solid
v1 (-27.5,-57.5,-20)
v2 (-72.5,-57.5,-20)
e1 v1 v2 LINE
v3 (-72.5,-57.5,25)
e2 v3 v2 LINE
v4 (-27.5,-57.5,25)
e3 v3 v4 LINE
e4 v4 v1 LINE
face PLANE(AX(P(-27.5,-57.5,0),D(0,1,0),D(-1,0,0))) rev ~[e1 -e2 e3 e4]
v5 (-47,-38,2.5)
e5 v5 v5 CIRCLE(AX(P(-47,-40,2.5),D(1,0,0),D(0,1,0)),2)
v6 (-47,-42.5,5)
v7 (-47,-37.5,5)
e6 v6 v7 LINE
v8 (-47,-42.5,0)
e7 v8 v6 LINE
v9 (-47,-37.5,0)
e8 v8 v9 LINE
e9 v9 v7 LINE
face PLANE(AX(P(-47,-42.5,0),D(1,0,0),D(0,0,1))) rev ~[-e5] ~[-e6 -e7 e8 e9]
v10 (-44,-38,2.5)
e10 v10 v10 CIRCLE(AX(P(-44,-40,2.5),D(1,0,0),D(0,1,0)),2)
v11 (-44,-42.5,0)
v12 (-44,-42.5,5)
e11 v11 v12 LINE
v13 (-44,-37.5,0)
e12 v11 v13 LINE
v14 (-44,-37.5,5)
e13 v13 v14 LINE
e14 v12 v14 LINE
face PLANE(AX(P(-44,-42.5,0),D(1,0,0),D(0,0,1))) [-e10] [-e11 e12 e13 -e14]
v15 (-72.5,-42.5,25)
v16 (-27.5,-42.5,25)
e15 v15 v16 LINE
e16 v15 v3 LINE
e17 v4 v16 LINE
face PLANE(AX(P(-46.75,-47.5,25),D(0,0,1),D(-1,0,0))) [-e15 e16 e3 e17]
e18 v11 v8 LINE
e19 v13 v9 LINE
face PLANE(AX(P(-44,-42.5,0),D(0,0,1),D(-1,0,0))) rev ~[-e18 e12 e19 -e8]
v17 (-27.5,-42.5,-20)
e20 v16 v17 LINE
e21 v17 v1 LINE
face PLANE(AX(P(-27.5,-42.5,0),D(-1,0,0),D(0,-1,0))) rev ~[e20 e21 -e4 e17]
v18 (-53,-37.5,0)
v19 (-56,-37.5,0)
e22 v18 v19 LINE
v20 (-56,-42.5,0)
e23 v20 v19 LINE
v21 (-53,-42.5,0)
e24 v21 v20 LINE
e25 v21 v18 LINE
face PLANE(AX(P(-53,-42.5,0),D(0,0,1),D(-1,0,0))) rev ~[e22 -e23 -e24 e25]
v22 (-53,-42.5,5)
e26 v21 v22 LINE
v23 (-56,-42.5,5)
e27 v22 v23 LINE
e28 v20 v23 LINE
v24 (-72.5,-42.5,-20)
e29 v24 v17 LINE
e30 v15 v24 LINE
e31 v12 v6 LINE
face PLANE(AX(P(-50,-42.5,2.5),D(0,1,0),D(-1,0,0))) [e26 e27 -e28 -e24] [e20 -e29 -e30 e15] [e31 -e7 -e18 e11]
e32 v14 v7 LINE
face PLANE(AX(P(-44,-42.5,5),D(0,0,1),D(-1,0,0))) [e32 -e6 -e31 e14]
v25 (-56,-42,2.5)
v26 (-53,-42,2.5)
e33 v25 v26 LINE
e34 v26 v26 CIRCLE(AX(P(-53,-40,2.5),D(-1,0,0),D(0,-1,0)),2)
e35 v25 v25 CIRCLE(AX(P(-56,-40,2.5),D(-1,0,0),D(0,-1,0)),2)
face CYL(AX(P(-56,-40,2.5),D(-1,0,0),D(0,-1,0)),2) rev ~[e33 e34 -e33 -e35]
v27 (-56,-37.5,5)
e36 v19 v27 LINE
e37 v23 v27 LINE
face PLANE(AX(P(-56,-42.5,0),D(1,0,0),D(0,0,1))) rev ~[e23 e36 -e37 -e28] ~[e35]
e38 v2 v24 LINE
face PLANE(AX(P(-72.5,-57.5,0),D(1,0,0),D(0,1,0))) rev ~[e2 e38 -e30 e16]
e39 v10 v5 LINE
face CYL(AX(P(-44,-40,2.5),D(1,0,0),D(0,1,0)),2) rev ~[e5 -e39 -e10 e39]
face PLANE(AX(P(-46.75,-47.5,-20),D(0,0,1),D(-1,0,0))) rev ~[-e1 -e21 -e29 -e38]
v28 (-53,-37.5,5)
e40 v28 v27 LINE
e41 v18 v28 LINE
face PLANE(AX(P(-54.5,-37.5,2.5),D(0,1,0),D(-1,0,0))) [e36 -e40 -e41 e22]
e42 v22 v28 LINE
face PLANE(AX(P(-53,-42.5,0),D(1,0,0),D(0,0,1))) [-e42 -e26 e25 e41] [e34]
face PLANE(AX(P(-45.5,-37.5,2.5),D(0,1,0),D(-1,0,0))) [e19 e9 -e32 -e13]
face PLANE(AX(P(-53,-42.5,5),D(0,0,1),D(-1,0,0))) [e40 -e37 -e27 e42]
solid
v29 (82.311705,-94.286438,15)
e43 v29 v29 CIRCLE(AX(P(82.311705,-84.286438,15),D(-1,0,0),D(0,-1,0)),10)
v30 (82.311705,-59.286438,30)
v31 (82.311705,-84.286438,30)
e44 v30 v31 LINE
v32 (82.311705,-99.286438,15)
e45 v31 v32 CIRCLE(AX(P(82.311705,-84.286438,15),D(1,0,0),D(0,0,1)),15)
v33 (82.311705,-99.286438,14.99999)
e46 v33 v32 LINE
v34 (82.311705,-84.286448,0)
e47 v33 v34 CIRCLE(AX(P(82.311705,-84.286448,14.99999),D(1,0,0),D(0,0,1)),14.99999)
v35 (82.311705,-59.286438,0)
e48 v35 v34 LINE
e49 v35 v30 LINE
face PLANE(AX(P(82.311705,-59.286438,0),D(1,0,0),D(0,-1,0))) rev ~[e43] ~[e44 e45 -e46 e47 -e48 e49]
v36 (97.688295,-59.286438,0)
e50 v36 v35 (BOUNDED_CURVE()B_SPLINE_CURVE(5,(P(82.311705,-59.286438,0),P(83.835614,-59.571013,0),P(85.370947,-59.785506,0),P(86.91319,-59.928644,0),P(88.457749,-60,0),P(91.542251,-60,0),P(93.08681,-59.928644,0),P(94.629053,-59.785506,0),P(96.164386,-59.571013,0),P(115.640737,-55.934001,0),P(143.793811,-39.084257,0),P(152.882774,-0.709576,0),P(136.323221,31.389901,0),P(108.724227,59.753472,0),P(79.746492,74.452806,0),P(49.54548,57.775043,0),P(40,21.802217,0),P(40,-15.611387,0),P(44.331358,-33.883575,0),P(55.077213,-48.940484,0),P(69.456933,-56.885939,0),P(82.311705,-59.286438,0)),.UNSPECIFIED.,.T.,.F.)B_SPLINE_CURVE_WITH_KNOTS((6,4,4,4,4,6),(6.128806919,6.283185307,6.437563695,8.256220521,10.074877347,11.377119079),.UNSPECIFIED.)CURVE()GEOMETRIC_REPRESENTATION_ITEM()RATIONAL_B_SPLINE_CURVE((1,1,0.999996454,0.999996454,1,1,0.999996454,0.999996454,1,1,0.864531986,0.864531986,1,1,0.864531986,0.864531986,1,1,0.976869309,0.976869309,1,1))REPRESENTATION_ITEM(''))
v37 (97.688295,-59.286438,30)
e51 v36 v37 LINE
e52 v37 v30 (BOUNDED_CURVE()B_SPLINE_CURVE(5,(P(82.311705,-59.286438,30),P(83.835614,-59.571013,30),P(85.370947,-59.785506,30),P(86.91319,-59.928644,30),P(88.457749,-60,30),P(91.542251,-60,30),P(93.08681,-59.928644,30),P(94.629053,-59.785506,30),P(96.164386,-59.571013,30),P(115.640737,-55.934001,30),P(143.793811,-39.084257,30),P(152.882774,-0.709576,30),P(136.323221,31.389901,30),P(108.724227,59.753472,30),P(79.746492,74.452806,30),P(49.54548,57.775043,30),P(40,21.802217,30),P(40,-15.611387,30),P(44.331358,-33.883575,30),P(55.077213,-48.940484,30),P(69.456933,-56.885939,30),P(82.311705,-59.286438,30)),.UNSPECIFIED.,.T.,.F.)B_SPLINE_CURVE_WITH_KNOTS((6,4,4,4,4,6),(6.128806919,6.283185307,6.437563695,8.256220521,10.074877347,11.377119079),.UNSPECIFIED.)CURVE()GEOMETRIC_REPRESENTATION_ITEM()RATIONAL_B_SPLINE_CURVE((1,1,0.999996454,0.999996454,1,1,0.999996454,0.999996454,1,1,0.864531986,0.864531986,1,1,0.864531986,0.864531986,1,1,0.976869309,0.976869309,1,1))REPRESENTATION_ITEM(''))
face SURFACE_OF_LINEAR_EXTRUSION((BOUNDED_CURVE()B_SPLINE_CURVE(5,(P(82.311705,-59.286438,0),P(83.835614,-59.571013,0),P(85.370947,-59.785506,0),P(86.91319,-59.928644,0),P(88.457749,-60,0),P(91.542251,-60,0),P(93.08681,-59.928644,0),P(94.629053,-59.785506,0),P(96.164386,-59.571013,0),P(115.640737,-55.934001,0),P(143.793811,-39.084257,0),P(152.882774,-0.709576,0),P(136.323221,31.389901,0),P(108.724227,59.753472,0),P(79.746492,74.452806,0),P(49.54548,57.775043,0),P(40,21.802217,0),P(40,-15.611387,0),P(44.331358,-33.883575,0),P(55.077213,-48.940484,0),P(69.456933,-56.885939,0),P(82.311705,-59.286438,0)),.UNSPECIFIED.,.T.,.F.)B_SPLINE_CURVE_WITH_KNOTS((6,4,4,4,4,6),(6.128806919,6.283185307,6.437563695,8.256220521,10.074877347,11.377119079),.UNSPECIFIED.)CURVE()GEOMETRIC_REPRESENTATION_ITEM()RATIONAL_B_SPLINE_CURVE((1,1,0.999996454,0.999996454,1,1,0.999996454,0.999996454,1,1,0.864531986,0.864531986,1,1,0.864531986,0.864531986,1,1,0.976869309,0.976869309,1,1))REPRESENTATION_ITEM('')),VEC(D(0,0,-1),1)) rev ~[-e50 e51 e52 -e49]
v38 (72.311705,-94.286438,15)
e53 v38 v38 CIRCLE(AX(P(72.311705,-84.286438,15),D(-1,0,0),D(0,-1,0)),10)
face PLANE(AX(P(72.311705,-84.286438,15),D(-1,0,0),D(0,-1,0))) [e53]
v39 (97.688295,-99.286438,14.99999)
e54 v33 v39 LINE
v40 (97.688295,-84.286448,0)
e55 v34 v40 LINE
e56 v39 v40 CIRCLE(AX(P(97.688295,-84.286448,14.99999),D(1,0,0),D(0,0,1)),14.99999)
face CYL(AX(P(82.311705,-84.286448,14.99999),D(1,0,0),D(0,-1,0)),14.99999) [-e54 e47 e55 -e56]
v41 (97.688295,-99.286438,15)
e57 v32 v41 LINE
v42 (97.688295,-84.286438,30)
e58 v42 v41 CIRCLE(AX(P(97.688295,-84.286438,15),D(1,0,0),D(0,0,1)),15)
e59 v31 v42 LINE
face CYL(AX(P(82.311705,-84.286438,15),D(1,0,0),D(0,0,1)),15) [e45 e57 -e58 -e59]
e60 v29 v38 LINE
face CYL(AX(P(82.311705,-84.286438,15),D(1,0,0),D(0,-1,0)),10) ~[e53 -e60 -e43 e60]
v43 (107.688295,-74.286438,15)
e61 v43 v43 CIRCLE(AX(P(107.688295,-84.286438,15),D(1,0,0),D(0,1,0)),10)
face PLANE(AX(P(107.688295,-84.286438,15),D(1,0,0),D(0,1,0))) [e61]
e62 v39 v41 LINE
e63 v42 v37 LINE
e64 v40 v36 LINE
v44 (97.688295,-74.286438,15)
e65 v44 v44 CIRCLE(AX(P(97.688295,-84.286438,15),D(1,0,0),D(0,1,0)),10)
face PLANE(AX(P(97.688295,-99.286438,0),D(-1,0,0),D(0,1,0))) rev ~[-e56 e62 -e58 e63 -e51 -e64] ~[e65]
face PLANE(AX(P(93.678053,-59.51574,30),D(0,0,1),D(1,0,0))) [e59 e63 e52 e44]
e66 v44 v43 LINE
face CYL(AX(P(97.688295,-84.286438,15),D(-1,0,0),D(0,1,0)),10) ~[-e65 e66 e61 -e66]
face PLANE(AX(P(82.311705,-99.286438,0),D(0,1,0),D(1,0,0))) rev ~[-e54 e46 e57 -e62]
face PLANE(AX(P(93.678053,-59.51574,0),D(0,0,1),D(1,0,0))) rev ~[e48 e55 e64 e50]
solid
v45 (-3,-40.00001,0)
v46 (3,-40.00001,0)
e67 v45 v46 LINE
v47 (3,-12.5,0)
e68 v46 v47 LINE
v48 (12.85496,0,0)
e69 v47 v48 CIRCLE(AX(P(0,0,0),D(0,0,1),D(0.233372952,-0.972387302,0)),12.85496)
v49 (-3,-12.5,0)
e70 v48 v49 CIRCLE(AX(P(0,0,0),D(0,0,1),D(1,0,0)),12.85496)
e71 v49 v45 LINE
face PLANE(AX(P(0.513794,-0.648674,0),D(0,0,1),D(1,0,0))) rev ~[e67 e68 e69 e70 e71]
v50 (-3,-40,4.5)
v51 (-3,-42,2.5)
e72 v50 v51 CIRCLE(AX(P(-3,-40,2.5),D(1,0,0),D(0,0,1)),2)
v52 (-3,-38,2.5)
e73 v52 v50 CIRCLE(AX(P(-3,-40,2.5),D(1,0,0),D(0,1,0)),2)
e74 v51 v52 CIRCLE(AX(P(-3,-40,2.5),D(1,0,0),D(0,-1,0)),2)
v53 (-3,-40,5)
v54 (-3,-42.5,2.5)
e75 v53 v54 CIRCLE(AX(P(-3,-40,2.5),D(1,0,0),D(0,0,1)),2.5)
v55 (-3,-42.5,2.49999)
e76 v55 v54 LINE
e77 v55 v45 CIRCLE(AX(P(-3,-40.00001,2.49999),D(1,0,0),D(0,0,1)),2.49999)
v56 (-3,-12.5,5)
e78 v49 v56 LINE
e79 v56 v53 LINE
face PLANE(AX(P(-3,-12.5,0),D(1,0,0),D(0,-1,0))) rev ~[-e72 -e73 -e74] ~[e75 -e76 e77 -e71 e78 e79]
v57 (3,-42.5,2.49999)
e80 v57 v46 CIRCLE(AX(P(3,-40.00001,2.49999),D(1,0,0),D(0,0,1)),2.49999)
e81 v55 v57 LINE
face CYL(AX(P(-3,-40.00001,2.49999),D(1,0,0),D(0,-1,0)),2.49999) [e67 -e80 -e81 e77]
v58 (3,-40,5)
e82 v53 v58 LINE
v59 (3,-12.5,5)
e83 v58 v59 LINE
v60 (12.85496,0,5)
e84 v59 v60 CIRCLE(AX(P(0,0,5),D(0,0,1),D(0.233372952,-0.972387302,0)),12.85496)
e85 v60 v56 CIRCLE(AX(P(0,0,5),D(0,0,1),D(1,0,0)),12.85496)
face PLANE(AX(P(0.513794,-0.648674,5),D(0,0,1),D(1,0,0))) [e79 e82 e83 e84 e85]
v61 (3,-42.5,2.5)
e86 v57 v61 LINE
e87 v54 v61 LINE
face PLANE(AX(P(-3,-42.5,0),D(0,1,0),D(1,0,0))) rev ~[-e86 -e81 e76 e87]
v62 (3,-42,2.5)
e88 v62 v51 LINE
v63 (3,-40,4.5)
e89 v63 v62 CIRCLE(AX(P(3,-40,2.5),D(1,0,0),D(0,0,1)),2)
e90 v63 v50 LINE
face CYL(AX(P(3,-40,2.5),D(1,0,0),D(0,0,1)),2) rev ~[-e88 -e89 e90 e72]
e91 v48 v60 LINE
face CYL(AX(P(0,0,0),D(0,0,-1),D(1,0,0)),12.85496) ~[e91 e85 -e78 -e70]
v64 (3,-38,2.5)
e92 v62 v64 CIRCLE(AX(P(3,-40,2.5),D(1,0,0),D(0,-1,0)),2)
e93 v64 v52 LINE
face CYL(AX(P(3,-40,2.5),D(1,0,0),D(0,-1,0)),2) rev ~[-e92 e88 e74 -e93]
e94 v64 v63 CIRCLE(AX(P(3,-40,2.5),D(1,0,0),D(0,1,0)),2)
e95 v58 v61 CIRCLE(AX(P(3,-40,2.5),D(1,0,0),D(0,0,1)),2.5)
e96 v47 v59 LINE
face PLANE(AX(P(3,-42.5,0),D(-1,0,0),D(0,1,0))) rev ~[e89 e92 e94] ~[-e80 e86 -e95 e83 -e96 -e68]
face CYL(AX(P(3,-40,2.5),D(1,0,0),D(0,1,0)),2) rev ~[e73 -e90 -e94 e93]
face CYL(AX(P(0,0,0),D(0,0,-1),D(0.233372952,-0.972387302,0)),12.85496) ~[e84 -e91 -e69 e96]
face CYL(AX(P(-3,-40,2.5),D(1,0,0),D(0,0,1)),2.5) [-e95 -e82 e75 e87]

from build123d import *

# Parameters (mm, degrees)
F1_DEPTH  = 5
F2_DEPTH  = 5
F4_DEPTH  = 10
F6_DEPTH  = 5
F8_DEPTH  = 20
F10_DEPTH = 20
F11_R     = 2.5
F12_R     = 2.49999
F13_W     = 6.5
F13_H     = 45
F14_DEPTH = 5
F15_W     = 3
F15_H     = 5
F16_DEPTH = 5
F17_R     = 2
F18_DEPTH = 3
F19_R     = 2
F20_DEPTH = 3
F22_DEPTH = 30
F23_DEPTH = 30
F25_DEPTH = 10
F26_R     = 10
F27_DEPTH = 10
F28_R     = 15
F29_R     = 14.99999


# Not quite as in the source:
# - a fillet or chamfer is up to 0.001 mm smaller than in the source, because OpenCascade refuses the exact size


with BuildPart() as f1:
    # F0 (on Top) → F1 (new body)
    with BuildSketch(Plane.XY):
        with BuildLine():
            ThreePointArc((0, -12.5), (8.8388347648, -8.8388347648), (12.5, 0))
            ThreePointArc((12.5, 0), (-8.8388347648, 8.8388347648), (0, -12.5))
        make_face()
    extrude(amount=F1_DEPTH)

    # F0 (on Top) → F2 (join)
    with BuildSketch(Plane.XY):
        with BuildLine():
            Line((-3, -12.5), (0, -12.5))
            Line((0, -12.5), (3, -12.5))
            ThreePointArc((3, -12.5), (10.0949215053, -7.9588039178), (12.8549601322, 0))
            ThreePointArc((12.8549601322, 0), (-7.9588039178, 10.0949215053), (-3, -12.5))
        make_face()
        with BuildLine():
            ThreePointArc((0, -12.5), (-8.8388347648, 8.8388347648), (12.5, 0))
            ThreePointArc((12.5, 0), (8.8388347648, -8.8388347648), (0, -12.5))
        make_face(mode=Mode.SUBTRACT)
        with BuildLine():
            Line((3, -12.5), (0, -12.5))
            Line((0, -12.5), (-3, -12.5))
            ThreePointArc((-3, -12.5), (0, -12.8549601322), (3, -12.5))
        make_face()
        with BuildLine():
            ThreePointArc((3, -12.5), (0, -12.8549601322), (-3, -12.5))
            Line((-3, -12.5), (-3, -42.5))
            Line((-3, -42.5), (3, -42.5))
            Line((3, -42.5), (3, -12.5))
        make_face()
    extrude(amount=F2_DEPTH)

    # F3 (on face) → F4 (cut)
    with BuildSketch(Plane.YZ.offset(3)):
        with BuildLine():
            ThreePointArc((-40, 4.5), (-41.4142135624, 3.9142135624), (-42, 2.5))
            Line((-42, 2.5), (-40, 2.5))
            Line((-40, 2.5), (-40, 4.5))
        make_face()
        with BuildLine():
            Line((-40, 2.5), (-42, 2.5))
            ThreePointArc((-42, 2.5), (-40, 0.5), (-38, 2.5))
            ThreePointArc((-38, 2.5), (-38.5857864376, 3.9142135624), (-40, 4.5))
            Line((-40, 4.5), (-40, 2.5))
        make_face()
    extrude(amount=-F4_DEPTH, mode=Mode.SUBTRACT)

    # F11
    f11_edges = [f1.edges().sort_by_distance(p)[0] for p in [
        (0, -42.5, 5),
    ]]
    fillet(f11_edges, radius=F11_R)

    # F12 (radius 2.5 in the source; OpenCascade refuses exactly that, so slightly less here)
    f12_edges = [f1.edges().sort_by_distance(p)[0] for p in [
        (0, -42.5, 0),
    ]]
    fillet(f12_edges, radius=F12_R)


with BuildPart() as f6:
    # F5 (on Top) → F6 (new body)
    with BuildSketch(Plane.XY):
        Polygon((-46.75, -47.5), (-50, -47.5), (-53.25, -47.5), (-53.25, -42.5), (-72.5, -42.5), (-72.5, -57.5), (-27.5, -57.5), (-27.5, -42.5), (-46.75, -42.5), align=None)
    extrude(amount=F6_DEPTH)

    # F7 (on face) → F8 (join)
    with BuildSketch(Plane.XY.offset(5)):
        Polygon((-53.25, -42.5), (-72.5, -42.5), (-72.5, -57.5), (-27.5, -57.5), (-27.5, -42.5), (-46.75, -42.5), (-46.75, -47.5), (-53.25, -47.5), align=None)
    extrude(amount=F8_DEPTH)

    # F9 (on face) → F10 (join)
    with BuildSketch(Plane(origin=(0, 0, 0), x_dir=(1, 0, 0), z_dir=(0, 0, -1))):
        Polygon((-46.75, 42.5), (-27.5, 42.5), (-27.5, 57.5), (-72.5, 57.5), (-72.5, 42.5), (-53.25, 42.5), (-53.25, 47.5), (-46.75, 47.5), align=None)
    extrude(amount=F10_DEPTH)

    # F13 (on face) → F14 (join)
    with BuildSketch(Plane(origin=(0, -47.5, 0), x_dir=(-1, 0, 0), z_dir=(0, 1, 0))):
        with Locations((50, 2.5)):
            Rectangle(F13_W, F13_H)
    extrude(amount=F14_DEPTH)

    # F15 (on face) → F16 (join)
    with BuildSketch(Plane(origin=(0, -42.5, 0), x_dir=(-1, 0, 0), z_dir=(0, 1, 0))):
        with Locations((54.5, 2.5)):
            Rectangle(F15_W, F15_H)
        with Locations((45.5, 2.5)):
            Rectangle(F15_W, F15_H)
    extrude(amount=F16_DEPTH)

    # F17 (on face) → F18 (cut)
    with BuildSketch(Plane(origin=(-56, 0, 0), x_dir=(0, -1, 0), z_dir=(-1, 0, 0))):
        with Locations((40, 2.5)):
            Circle(F17_R)
    extrude(amount=-F18_DEPTH, mode=Mode.SUBTRACT)

    # F19 (on face) → F20 (cut)
    with BuildSketch(Plane.YZ.offset(-44)):
        with Locations((-40, 2.5)):
            Circle(F19_R)
    extrude(amount=-F20_DEPTH, mode=Mode.SUBTRACT)


with BuildPart() as f22:
    # F21 (on Top) → F22 (new body)
    with BuildSketch(Plane.XY):
        with BuildLine():
            add(Edge.make_bspline(
                [(90, -60), (93.8671431109, -60), (97.6882954661, -59.2864382677)],
                knots=[0, 0, 0, 0.1543783876, 0.1543783876, 0.1543783876], degree=2, weights=[1, 0.997022393, 1]))
            Line((97.6882954661, -59.2864382677), (90, -59.2864382677))
            Line((90, -59.2864382677), (90, -60))
        make_face()
        with BuildLine():
            add(Edge.make_bspline(
                [(97.6882954661, -59.2864382677), (205.0474477085, -39.2381974411), (122.5237238542, 45.5716867888), (40, 130.3815710188), (40, 0)],
                knots=[0.1543783876, 0.1543783876, 0.1543783876, 2.433383684, 2.433383684, 4.7123889804, 4.7123889804, 4.7123889804], degree=2, weights=[1, 0.4180463628, 1, 0.4180463628, 1]))
            Line((40, 0), (90, 0))
            Line((90, 0), (90, -59.2864382677))
            Line((90, -59.2864382677), (97.6882954661, -59.2864382677))
        make_face()
        with BuildLine():
            Line((90, 0), (40, 0))
            add(Edge.make_bspline(
                [(40, 0), (40, -51.3851534255), (82.3117045339, -59.2864382677)],
                knots=[4.7123889804, 4.7123889804, 4.7123889804, 6.1288069195, 6.1288069195, 6.1288069195], degree=2, weights=[1, 0.7595281131, 1]))
            Line((82.3117045339, -59.2864382677), (90, -59.2864382677))
            Line((90, -59.2864382677), (90, 0))
        make_face()
        with BuildLine():
            Line((90, -59.2864382677), (82.3117045339, -59.2864382677))
            add(Edge.make_bspline(
                [(82.3117045339, -59.2864382677), (86.1328568891, -60), (90, -60)],
                knots=[6.1288069195, 6.1288069195, 6.1288069195, 6.2831853072, 6.2831853072, 6.2831853072], degree=2, weights=[1, 0.997022393, 1]))
            Line((90, -60), (90, -59.2864382677))
        make_face()
    extrude(amount=F22_DEPTH)

    # F21 (on Top) → F23 (join)
    with BuildSketch(Plane.XY):
        with BuildLine():
            add(Edge.make_bspline(
                [(97.6882954661, -59.2864382677), (205.0474477085, -39.2381974411), (122.5237238542, 45.5716867888), (40, 130.3815710188), (40, 0)],
                knots=[0.1543783876, 0.1543783876, 0.1543783876, 2.433383684, 2.433383684, 4.7123889804, 4.7123889804, 4.7123889804], degree=2, weights=[1, 0.4180463628, 1, 0.4180463628, 1]))
            Line((40, 0), (90, 0))
            Line((90, 0), (90, -59.2864382677))
            Line((90, -59.2864382677), (97.6882954661, -59.2864382677))
        make_face()
        with BuildLine():
            Line((90, 0), (40, 0))
            add(Edge.make_bspline(
                [(40, 0), (40, -51.3851534255), (82.3117045339, -59.2864382677)],
                knots=[4.7123889804, 4.7123889804, 4.7123889804, 6.1288069195, 6.1288069195, 6.1288069195], degree=2, weights=[1, 0.7595281131, 1]))
            Line((82.3117045339, -59.2864382677), (90, -59.2864382677))
            Line((90, -59.2864382677), (90, 0))
        make_face()
        with BuildLine():
            Line((97.6882954661, -99.2864382677), (97.6882954661, -59.2864382677))
            add(Edge.make_bspline(
                [(90, -60), (93.8671431109, -60), (97.6882954661, -59.2864382677)],
                knots=[0, 0, 0, 0.1543783876, 0.1543783876, 0.1543783876], degree=2, weights=[1, 0.997022393, 1]))
            add(Edge.make_bspline(
                [(82.3117045339, -59.2864382677), (86.1328568891, -60), (90, -60)],
                knots=[6.1288069195, 6.1288069195, 6.1288069195, 6.2831853072, 6.2831853072, 6.2831853072], degree=2, weights=[1, 0.997022393, 1]))
            Line((82.3117045339, -59.2864382677), (82.3117045339, -99.2864382677))
            Line((82.3117045339, -99.2864382677), (97.6882954661, -99.2864382677))
        make_face()
        with BuildLine():
            add(Edge.make_bspline(
                [(90, -60), (93.8671431109, -60), (97.6882954661, -59.2864382677)],
                knots=[0, 0, 0, 0.1543783876, 0.1543783876, 0.1543783876], degree=2, weights=[1, 0.997022393, 1]))
            Line((97.6882954661, -59.2864382677), (90, -59.2864382677))
            Line((90, -59.2864382677), (90, -60))
        make_face()
        with BuildLine():
            Line((90, -59.2864382677), (82.3117045339, -59.2864382677))
            add(Edge.make_bspline(
                [(82.3117045339, -59.2864382677), (86.1328568891, -60), (90, -60)],
                knots=[6.1288069195, 6.1288069195, 6.1288069195, 6.2831853072, 6.2831853072, 6.2831853072], degree=2, weights=[1, 0.997022393, 1]))
            Line((90, -60), (90, -59.2864382677))
        make_face()
    extrude(amount=F23_DEPTH)

    # F24 (on face) → F25 (join)
    with BuildSketch(Plane.YZ.offset(97.6882954661)):
        with BuildLine():
            ThreePointArc((-94.2864382677, 15), (-84.2864382677, 5), (-74.2864382677, 15))
            ThreePointArc((-74.2864382677, 15), (-84.2864382677, 25), (-94.2864382677, 15))
        make_face()
    extrude(amount=F25_DEPTH)

    # F26 (on face) → F27 (join)
    with BuildSketch(Plane(origin=(82.3117045339, 0, 0), x_dir=(0, -1, 0), z_dir=(-1, 0, 0))):
        with Locations((84.2864382677, 15)):
            Circle(F26_R)
    extrude(amount=F27_DEPTH)

    # F28
    f28_edges = [f22.edges().sort_by_distance(p)[0] for p in [
        (90, -99.286438, 30),
    ]]
    fillet(f28_edges, radius=F28_R)

    # F29 (radius 15 in the source; OpenCascade refuses exactly that, so slightly less here)
    f29_edges = [f22.edges().sort_by_distance(p)[0] for p in [
        (90, -99.286438, 0),
    ]]
    fillet(f29_edges, radius=F29_R)


solid = Compound([f1.part, f6.part, f22.part])
